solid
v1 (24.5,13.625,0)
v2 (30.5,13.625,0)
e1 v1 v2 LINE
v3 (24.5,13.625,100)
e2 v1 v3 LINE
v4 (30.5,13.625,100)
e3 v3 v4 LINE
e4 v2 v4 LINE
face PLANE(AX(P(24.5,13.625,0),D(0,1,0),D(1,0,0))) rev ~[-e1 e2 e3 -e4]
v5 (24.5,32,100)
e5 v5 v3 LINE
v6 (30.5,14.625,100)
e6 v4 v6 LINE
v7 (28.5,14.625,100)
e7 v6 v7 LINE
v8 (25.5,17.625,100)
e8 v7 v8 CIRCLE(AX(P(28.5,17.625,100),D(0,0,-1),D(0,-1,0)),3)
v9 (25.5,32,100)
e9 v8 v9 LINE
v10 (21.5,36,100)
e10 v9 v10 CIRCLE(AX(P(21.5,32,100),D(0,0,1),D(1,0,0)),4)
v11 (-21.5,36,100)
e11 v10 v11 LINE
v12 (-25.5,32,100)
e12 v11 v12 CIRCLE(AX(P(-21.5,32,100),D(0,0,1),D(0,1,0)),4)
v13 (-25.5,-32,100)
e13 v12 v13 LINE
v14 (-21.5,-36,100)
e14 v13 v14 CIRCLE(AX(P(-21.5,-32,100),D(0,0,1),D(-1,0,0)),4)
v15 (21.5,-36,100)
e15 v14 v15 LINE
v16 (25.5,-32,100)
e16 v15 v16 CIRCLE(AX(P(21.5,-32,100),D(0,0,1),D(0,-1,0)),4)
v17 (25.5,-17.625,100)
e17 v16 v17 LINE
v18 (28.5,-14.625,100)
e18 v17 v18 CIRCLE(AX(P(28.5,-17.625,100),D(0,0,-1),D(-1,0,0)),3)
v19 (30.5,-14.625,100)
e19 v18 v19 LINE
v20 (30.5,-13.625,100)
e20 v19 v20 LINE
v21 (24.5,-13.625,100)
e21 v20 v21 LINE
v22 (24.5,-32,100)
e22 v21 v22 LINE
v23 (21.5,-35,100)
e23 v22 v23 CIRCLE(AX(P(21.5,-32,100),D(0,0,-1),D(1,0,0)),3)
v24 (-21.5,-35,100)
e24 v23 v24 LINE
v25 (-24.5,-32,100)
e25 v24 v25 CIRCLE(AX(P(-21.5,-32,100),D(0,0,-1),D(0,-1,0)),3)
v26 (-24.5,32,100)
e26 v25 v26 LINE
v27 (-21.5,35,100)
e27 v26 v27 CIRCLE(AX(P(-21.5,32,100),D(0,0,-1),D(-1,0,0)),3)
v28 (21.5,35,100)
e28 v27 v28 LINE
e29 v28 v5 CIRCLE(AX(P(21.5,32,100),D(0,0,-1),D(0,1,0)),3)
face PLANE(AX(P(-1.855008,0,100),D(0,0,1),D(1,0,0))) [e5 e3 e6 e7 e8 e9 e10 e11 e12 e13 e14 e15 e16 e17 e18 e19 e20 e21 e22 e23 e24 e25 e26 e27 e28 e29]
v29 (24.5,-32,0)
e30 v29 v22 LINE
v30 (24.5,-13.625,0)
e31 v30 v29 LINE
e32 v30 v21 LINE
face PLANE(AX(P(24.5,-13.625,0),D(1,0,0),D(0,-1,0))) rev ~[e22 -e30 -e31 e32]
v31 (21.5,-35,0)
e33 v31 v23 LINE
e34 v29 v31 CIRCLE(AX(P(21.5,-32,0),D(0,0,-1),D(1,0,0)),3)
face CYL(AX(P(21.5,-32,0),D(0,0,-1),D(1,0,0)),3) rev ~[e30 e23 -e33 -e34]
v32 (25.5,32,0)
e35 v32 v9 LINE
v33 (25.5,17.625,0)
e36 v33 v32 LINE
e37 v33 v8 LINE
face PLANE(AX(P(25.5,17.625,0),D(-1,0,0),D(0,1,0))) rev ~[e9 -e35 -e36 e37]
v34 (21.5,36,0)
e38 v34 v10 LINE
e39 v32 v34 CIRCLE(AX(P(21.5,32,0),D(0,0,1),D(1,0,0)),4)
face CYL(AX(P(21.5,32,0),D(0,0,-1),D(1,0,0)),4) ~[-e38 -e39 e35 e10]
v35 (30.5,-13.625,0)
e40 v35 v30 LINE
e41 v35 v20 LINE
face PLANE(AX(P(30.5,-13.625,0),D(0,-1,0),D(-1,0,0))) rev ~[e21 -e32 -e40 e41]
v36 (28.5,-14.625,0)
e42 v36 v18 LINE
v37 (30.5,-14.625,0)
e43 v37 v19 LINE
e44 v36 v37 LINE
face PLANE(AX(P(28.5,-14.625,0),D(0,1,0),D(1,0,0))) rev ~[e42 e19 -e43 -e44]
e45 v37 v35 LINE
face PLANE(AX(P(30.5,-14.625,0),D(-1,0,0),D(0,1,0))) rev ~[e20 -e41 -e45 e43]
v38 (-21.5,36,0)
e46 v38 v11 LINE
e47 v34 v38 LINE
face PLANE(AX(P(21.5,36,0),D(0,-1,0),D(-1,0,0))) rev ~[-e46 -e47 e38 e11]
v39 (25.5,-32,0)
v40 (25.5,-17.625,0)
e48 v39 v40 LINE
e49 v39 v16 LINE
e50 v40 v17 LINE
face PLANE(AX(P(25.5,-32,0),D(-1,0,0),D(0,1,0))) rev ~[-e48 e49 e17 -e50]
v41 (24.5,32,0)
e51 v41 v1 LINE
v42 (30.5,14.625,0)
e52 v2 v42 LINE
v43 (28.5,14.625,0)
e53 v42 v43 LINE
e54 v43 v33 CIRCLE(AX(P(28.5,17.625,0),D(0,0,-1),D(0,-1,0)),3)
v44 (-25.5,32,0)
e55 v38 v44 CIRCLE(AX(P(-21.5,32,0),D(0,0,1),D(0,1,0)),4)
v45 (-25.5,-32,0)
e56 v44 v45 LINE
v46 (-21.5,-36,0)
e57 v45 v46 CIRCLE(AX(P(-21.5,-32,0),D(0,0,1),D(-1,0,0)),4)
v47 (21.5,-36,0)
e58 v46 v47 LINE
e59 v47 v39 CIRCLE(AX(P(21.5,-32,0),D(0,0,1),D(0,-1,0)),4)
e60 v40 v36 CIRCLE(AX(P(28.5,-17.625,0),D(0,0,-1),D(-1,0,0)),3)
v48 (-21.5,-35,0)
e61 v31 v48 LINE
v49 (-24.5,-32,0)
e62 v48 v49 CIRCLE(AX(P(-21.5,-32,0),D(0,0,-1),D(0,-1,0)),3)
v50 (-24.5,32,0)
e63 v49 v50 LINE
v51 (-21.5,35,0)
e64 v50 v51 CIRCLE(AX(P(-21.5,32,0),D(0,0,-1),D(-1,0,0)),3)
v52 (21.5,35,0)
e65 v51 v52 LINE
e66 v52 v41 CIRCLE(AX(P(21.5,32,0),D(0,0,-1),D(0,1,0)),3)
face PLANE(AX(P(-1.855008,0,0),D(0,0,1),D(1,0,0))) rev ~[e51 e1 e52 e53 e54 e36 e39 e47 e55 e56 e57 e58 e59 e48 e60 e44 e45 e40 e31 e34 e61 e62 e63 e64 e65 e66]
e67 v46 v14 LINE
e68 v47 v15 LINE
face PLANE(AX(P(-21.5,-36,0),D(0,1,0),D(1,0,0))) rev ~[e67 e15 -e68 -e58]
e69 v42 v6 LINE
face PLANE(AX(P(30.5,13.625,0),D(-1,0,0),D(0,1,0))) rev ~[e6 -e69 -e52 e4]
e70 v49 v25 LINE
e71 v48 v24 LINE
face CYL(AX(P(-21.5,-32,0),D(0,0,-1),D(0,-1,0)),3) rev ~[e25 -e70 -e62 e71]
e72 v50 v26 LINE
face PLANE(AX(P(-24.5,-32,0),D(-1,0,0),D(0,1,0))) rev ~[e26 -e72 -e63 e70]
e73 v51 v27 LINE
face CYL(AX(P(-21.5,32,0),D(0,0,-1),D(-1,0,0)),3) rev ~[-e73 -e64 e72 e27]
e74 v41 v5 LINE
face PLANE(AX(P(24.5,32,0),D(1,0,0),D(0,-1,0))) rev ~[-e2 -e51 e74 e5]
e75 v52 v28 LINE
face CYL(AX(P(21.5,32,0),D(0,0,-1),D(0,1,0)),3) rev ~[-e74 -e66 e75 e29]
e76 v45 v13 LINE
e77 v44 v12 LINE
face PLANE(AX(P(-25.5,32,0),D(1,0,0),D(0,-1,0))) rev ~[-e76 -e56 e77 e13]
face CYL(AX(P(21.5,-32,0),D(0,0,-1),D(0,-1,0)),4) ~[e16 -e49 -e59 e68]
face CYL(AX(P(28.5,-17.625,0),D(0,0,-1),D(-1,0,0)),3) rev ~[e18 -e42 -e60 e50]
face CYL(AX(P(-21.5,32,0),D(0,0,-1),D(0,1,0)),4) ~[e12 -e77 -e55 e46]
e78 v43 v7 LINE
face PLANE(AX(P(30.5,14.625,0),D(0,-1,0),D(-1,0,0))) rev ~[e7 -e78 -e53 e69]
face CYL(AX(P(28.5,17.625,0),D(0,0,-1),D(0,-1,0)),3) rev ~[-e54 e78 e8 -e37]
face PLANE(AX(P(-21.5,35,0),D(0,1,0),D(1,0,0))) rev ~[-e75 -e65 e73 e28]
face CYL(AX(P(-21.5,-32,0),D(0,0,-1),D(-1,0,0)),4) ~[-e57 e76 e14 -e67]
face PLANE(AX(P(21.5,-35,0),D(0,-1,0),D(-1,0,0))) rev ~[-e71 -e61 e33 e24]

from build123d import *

# Parameters (mm, degrees)
F1_DEPTH = 100


# Not quite as in the source:
# - a feature names something its author has since deleted; it is built from what else it names


with BuildPart() as f1:
    # F0 (on Top) → F1 (new body)
    with BuildSketch(Plane.XY):
        with BuildLine():
            Line((-21.5, 35), (21.5, 35))
            ThreePointArc((21.5, 35), (23.6213203436, 34.1213203436), (24.5, 32))
            Line((24.5, 32), (24.5, 13.625))
            Line((24.5, 13.625), (30.5, 13.625))
            Line((30.5, 13.625), (30.5, 14.625))
            Line((30.5, 14.625), (28.5, 14.625))
            ThreePointArc((28.5, 14.625), (26.3786796564, 15.5036796564), (25.5, 17.625))
            Line((25.5, 17.625), (25.5, 32))
            ThreePointArc((25.5, 32), (24.3284271247, 34.8284271247), (21.5, 36))
            Line((21.5, 36), (-21.5, 36))
            ThreePointArc((-21.5, 36), (-24.3284271247, 34.8284271247), (-25.5, 32))
            Line((-25.5, 32), (-25.5, -32))
            ThreePointArc((-25.5, -32), (-24.3284271247, -34.8284271247), (-21.5, -36))
            Line((-21.5, -36), (21.5, -36))
            ThreePointArc((21.5, -36), (24.3284271247, -34.8284271247), (25.5, -32))
            Line((25.5, -32), (25.5, -17.625))
            ThreePointArc((25.5, -17.625), (26.3786796564, -15.5036796564), (28.5, -14.625))
            Line((28.5, -14.625), (30.5, -14.625))
            Line((30.5, -14.625), (30.5, -13.625))
            Line((30.5, -13.625), (24.5, -13.625))
            Line((24.5, -13.625), (24.5, -32))
            ThreePointArc((24.5, -32), (23.6213203436, -34.1213203436), (21.5, -35))
            Line((21.5, -35), (-21.5, -35))
            ThreePointArc((-21.5, -35), (-23.6213203436, -34.1213203436), (-24.5, -32))
            Line((-24.5, -32), (-24.5, 32))
            ThreePointArc((-24.5, 32), (-23.6213203436, 34.1213203436), (-21.5, 35))
        make_face()
    extrude(amount=F1_DEPTH)


solid = f1.part
